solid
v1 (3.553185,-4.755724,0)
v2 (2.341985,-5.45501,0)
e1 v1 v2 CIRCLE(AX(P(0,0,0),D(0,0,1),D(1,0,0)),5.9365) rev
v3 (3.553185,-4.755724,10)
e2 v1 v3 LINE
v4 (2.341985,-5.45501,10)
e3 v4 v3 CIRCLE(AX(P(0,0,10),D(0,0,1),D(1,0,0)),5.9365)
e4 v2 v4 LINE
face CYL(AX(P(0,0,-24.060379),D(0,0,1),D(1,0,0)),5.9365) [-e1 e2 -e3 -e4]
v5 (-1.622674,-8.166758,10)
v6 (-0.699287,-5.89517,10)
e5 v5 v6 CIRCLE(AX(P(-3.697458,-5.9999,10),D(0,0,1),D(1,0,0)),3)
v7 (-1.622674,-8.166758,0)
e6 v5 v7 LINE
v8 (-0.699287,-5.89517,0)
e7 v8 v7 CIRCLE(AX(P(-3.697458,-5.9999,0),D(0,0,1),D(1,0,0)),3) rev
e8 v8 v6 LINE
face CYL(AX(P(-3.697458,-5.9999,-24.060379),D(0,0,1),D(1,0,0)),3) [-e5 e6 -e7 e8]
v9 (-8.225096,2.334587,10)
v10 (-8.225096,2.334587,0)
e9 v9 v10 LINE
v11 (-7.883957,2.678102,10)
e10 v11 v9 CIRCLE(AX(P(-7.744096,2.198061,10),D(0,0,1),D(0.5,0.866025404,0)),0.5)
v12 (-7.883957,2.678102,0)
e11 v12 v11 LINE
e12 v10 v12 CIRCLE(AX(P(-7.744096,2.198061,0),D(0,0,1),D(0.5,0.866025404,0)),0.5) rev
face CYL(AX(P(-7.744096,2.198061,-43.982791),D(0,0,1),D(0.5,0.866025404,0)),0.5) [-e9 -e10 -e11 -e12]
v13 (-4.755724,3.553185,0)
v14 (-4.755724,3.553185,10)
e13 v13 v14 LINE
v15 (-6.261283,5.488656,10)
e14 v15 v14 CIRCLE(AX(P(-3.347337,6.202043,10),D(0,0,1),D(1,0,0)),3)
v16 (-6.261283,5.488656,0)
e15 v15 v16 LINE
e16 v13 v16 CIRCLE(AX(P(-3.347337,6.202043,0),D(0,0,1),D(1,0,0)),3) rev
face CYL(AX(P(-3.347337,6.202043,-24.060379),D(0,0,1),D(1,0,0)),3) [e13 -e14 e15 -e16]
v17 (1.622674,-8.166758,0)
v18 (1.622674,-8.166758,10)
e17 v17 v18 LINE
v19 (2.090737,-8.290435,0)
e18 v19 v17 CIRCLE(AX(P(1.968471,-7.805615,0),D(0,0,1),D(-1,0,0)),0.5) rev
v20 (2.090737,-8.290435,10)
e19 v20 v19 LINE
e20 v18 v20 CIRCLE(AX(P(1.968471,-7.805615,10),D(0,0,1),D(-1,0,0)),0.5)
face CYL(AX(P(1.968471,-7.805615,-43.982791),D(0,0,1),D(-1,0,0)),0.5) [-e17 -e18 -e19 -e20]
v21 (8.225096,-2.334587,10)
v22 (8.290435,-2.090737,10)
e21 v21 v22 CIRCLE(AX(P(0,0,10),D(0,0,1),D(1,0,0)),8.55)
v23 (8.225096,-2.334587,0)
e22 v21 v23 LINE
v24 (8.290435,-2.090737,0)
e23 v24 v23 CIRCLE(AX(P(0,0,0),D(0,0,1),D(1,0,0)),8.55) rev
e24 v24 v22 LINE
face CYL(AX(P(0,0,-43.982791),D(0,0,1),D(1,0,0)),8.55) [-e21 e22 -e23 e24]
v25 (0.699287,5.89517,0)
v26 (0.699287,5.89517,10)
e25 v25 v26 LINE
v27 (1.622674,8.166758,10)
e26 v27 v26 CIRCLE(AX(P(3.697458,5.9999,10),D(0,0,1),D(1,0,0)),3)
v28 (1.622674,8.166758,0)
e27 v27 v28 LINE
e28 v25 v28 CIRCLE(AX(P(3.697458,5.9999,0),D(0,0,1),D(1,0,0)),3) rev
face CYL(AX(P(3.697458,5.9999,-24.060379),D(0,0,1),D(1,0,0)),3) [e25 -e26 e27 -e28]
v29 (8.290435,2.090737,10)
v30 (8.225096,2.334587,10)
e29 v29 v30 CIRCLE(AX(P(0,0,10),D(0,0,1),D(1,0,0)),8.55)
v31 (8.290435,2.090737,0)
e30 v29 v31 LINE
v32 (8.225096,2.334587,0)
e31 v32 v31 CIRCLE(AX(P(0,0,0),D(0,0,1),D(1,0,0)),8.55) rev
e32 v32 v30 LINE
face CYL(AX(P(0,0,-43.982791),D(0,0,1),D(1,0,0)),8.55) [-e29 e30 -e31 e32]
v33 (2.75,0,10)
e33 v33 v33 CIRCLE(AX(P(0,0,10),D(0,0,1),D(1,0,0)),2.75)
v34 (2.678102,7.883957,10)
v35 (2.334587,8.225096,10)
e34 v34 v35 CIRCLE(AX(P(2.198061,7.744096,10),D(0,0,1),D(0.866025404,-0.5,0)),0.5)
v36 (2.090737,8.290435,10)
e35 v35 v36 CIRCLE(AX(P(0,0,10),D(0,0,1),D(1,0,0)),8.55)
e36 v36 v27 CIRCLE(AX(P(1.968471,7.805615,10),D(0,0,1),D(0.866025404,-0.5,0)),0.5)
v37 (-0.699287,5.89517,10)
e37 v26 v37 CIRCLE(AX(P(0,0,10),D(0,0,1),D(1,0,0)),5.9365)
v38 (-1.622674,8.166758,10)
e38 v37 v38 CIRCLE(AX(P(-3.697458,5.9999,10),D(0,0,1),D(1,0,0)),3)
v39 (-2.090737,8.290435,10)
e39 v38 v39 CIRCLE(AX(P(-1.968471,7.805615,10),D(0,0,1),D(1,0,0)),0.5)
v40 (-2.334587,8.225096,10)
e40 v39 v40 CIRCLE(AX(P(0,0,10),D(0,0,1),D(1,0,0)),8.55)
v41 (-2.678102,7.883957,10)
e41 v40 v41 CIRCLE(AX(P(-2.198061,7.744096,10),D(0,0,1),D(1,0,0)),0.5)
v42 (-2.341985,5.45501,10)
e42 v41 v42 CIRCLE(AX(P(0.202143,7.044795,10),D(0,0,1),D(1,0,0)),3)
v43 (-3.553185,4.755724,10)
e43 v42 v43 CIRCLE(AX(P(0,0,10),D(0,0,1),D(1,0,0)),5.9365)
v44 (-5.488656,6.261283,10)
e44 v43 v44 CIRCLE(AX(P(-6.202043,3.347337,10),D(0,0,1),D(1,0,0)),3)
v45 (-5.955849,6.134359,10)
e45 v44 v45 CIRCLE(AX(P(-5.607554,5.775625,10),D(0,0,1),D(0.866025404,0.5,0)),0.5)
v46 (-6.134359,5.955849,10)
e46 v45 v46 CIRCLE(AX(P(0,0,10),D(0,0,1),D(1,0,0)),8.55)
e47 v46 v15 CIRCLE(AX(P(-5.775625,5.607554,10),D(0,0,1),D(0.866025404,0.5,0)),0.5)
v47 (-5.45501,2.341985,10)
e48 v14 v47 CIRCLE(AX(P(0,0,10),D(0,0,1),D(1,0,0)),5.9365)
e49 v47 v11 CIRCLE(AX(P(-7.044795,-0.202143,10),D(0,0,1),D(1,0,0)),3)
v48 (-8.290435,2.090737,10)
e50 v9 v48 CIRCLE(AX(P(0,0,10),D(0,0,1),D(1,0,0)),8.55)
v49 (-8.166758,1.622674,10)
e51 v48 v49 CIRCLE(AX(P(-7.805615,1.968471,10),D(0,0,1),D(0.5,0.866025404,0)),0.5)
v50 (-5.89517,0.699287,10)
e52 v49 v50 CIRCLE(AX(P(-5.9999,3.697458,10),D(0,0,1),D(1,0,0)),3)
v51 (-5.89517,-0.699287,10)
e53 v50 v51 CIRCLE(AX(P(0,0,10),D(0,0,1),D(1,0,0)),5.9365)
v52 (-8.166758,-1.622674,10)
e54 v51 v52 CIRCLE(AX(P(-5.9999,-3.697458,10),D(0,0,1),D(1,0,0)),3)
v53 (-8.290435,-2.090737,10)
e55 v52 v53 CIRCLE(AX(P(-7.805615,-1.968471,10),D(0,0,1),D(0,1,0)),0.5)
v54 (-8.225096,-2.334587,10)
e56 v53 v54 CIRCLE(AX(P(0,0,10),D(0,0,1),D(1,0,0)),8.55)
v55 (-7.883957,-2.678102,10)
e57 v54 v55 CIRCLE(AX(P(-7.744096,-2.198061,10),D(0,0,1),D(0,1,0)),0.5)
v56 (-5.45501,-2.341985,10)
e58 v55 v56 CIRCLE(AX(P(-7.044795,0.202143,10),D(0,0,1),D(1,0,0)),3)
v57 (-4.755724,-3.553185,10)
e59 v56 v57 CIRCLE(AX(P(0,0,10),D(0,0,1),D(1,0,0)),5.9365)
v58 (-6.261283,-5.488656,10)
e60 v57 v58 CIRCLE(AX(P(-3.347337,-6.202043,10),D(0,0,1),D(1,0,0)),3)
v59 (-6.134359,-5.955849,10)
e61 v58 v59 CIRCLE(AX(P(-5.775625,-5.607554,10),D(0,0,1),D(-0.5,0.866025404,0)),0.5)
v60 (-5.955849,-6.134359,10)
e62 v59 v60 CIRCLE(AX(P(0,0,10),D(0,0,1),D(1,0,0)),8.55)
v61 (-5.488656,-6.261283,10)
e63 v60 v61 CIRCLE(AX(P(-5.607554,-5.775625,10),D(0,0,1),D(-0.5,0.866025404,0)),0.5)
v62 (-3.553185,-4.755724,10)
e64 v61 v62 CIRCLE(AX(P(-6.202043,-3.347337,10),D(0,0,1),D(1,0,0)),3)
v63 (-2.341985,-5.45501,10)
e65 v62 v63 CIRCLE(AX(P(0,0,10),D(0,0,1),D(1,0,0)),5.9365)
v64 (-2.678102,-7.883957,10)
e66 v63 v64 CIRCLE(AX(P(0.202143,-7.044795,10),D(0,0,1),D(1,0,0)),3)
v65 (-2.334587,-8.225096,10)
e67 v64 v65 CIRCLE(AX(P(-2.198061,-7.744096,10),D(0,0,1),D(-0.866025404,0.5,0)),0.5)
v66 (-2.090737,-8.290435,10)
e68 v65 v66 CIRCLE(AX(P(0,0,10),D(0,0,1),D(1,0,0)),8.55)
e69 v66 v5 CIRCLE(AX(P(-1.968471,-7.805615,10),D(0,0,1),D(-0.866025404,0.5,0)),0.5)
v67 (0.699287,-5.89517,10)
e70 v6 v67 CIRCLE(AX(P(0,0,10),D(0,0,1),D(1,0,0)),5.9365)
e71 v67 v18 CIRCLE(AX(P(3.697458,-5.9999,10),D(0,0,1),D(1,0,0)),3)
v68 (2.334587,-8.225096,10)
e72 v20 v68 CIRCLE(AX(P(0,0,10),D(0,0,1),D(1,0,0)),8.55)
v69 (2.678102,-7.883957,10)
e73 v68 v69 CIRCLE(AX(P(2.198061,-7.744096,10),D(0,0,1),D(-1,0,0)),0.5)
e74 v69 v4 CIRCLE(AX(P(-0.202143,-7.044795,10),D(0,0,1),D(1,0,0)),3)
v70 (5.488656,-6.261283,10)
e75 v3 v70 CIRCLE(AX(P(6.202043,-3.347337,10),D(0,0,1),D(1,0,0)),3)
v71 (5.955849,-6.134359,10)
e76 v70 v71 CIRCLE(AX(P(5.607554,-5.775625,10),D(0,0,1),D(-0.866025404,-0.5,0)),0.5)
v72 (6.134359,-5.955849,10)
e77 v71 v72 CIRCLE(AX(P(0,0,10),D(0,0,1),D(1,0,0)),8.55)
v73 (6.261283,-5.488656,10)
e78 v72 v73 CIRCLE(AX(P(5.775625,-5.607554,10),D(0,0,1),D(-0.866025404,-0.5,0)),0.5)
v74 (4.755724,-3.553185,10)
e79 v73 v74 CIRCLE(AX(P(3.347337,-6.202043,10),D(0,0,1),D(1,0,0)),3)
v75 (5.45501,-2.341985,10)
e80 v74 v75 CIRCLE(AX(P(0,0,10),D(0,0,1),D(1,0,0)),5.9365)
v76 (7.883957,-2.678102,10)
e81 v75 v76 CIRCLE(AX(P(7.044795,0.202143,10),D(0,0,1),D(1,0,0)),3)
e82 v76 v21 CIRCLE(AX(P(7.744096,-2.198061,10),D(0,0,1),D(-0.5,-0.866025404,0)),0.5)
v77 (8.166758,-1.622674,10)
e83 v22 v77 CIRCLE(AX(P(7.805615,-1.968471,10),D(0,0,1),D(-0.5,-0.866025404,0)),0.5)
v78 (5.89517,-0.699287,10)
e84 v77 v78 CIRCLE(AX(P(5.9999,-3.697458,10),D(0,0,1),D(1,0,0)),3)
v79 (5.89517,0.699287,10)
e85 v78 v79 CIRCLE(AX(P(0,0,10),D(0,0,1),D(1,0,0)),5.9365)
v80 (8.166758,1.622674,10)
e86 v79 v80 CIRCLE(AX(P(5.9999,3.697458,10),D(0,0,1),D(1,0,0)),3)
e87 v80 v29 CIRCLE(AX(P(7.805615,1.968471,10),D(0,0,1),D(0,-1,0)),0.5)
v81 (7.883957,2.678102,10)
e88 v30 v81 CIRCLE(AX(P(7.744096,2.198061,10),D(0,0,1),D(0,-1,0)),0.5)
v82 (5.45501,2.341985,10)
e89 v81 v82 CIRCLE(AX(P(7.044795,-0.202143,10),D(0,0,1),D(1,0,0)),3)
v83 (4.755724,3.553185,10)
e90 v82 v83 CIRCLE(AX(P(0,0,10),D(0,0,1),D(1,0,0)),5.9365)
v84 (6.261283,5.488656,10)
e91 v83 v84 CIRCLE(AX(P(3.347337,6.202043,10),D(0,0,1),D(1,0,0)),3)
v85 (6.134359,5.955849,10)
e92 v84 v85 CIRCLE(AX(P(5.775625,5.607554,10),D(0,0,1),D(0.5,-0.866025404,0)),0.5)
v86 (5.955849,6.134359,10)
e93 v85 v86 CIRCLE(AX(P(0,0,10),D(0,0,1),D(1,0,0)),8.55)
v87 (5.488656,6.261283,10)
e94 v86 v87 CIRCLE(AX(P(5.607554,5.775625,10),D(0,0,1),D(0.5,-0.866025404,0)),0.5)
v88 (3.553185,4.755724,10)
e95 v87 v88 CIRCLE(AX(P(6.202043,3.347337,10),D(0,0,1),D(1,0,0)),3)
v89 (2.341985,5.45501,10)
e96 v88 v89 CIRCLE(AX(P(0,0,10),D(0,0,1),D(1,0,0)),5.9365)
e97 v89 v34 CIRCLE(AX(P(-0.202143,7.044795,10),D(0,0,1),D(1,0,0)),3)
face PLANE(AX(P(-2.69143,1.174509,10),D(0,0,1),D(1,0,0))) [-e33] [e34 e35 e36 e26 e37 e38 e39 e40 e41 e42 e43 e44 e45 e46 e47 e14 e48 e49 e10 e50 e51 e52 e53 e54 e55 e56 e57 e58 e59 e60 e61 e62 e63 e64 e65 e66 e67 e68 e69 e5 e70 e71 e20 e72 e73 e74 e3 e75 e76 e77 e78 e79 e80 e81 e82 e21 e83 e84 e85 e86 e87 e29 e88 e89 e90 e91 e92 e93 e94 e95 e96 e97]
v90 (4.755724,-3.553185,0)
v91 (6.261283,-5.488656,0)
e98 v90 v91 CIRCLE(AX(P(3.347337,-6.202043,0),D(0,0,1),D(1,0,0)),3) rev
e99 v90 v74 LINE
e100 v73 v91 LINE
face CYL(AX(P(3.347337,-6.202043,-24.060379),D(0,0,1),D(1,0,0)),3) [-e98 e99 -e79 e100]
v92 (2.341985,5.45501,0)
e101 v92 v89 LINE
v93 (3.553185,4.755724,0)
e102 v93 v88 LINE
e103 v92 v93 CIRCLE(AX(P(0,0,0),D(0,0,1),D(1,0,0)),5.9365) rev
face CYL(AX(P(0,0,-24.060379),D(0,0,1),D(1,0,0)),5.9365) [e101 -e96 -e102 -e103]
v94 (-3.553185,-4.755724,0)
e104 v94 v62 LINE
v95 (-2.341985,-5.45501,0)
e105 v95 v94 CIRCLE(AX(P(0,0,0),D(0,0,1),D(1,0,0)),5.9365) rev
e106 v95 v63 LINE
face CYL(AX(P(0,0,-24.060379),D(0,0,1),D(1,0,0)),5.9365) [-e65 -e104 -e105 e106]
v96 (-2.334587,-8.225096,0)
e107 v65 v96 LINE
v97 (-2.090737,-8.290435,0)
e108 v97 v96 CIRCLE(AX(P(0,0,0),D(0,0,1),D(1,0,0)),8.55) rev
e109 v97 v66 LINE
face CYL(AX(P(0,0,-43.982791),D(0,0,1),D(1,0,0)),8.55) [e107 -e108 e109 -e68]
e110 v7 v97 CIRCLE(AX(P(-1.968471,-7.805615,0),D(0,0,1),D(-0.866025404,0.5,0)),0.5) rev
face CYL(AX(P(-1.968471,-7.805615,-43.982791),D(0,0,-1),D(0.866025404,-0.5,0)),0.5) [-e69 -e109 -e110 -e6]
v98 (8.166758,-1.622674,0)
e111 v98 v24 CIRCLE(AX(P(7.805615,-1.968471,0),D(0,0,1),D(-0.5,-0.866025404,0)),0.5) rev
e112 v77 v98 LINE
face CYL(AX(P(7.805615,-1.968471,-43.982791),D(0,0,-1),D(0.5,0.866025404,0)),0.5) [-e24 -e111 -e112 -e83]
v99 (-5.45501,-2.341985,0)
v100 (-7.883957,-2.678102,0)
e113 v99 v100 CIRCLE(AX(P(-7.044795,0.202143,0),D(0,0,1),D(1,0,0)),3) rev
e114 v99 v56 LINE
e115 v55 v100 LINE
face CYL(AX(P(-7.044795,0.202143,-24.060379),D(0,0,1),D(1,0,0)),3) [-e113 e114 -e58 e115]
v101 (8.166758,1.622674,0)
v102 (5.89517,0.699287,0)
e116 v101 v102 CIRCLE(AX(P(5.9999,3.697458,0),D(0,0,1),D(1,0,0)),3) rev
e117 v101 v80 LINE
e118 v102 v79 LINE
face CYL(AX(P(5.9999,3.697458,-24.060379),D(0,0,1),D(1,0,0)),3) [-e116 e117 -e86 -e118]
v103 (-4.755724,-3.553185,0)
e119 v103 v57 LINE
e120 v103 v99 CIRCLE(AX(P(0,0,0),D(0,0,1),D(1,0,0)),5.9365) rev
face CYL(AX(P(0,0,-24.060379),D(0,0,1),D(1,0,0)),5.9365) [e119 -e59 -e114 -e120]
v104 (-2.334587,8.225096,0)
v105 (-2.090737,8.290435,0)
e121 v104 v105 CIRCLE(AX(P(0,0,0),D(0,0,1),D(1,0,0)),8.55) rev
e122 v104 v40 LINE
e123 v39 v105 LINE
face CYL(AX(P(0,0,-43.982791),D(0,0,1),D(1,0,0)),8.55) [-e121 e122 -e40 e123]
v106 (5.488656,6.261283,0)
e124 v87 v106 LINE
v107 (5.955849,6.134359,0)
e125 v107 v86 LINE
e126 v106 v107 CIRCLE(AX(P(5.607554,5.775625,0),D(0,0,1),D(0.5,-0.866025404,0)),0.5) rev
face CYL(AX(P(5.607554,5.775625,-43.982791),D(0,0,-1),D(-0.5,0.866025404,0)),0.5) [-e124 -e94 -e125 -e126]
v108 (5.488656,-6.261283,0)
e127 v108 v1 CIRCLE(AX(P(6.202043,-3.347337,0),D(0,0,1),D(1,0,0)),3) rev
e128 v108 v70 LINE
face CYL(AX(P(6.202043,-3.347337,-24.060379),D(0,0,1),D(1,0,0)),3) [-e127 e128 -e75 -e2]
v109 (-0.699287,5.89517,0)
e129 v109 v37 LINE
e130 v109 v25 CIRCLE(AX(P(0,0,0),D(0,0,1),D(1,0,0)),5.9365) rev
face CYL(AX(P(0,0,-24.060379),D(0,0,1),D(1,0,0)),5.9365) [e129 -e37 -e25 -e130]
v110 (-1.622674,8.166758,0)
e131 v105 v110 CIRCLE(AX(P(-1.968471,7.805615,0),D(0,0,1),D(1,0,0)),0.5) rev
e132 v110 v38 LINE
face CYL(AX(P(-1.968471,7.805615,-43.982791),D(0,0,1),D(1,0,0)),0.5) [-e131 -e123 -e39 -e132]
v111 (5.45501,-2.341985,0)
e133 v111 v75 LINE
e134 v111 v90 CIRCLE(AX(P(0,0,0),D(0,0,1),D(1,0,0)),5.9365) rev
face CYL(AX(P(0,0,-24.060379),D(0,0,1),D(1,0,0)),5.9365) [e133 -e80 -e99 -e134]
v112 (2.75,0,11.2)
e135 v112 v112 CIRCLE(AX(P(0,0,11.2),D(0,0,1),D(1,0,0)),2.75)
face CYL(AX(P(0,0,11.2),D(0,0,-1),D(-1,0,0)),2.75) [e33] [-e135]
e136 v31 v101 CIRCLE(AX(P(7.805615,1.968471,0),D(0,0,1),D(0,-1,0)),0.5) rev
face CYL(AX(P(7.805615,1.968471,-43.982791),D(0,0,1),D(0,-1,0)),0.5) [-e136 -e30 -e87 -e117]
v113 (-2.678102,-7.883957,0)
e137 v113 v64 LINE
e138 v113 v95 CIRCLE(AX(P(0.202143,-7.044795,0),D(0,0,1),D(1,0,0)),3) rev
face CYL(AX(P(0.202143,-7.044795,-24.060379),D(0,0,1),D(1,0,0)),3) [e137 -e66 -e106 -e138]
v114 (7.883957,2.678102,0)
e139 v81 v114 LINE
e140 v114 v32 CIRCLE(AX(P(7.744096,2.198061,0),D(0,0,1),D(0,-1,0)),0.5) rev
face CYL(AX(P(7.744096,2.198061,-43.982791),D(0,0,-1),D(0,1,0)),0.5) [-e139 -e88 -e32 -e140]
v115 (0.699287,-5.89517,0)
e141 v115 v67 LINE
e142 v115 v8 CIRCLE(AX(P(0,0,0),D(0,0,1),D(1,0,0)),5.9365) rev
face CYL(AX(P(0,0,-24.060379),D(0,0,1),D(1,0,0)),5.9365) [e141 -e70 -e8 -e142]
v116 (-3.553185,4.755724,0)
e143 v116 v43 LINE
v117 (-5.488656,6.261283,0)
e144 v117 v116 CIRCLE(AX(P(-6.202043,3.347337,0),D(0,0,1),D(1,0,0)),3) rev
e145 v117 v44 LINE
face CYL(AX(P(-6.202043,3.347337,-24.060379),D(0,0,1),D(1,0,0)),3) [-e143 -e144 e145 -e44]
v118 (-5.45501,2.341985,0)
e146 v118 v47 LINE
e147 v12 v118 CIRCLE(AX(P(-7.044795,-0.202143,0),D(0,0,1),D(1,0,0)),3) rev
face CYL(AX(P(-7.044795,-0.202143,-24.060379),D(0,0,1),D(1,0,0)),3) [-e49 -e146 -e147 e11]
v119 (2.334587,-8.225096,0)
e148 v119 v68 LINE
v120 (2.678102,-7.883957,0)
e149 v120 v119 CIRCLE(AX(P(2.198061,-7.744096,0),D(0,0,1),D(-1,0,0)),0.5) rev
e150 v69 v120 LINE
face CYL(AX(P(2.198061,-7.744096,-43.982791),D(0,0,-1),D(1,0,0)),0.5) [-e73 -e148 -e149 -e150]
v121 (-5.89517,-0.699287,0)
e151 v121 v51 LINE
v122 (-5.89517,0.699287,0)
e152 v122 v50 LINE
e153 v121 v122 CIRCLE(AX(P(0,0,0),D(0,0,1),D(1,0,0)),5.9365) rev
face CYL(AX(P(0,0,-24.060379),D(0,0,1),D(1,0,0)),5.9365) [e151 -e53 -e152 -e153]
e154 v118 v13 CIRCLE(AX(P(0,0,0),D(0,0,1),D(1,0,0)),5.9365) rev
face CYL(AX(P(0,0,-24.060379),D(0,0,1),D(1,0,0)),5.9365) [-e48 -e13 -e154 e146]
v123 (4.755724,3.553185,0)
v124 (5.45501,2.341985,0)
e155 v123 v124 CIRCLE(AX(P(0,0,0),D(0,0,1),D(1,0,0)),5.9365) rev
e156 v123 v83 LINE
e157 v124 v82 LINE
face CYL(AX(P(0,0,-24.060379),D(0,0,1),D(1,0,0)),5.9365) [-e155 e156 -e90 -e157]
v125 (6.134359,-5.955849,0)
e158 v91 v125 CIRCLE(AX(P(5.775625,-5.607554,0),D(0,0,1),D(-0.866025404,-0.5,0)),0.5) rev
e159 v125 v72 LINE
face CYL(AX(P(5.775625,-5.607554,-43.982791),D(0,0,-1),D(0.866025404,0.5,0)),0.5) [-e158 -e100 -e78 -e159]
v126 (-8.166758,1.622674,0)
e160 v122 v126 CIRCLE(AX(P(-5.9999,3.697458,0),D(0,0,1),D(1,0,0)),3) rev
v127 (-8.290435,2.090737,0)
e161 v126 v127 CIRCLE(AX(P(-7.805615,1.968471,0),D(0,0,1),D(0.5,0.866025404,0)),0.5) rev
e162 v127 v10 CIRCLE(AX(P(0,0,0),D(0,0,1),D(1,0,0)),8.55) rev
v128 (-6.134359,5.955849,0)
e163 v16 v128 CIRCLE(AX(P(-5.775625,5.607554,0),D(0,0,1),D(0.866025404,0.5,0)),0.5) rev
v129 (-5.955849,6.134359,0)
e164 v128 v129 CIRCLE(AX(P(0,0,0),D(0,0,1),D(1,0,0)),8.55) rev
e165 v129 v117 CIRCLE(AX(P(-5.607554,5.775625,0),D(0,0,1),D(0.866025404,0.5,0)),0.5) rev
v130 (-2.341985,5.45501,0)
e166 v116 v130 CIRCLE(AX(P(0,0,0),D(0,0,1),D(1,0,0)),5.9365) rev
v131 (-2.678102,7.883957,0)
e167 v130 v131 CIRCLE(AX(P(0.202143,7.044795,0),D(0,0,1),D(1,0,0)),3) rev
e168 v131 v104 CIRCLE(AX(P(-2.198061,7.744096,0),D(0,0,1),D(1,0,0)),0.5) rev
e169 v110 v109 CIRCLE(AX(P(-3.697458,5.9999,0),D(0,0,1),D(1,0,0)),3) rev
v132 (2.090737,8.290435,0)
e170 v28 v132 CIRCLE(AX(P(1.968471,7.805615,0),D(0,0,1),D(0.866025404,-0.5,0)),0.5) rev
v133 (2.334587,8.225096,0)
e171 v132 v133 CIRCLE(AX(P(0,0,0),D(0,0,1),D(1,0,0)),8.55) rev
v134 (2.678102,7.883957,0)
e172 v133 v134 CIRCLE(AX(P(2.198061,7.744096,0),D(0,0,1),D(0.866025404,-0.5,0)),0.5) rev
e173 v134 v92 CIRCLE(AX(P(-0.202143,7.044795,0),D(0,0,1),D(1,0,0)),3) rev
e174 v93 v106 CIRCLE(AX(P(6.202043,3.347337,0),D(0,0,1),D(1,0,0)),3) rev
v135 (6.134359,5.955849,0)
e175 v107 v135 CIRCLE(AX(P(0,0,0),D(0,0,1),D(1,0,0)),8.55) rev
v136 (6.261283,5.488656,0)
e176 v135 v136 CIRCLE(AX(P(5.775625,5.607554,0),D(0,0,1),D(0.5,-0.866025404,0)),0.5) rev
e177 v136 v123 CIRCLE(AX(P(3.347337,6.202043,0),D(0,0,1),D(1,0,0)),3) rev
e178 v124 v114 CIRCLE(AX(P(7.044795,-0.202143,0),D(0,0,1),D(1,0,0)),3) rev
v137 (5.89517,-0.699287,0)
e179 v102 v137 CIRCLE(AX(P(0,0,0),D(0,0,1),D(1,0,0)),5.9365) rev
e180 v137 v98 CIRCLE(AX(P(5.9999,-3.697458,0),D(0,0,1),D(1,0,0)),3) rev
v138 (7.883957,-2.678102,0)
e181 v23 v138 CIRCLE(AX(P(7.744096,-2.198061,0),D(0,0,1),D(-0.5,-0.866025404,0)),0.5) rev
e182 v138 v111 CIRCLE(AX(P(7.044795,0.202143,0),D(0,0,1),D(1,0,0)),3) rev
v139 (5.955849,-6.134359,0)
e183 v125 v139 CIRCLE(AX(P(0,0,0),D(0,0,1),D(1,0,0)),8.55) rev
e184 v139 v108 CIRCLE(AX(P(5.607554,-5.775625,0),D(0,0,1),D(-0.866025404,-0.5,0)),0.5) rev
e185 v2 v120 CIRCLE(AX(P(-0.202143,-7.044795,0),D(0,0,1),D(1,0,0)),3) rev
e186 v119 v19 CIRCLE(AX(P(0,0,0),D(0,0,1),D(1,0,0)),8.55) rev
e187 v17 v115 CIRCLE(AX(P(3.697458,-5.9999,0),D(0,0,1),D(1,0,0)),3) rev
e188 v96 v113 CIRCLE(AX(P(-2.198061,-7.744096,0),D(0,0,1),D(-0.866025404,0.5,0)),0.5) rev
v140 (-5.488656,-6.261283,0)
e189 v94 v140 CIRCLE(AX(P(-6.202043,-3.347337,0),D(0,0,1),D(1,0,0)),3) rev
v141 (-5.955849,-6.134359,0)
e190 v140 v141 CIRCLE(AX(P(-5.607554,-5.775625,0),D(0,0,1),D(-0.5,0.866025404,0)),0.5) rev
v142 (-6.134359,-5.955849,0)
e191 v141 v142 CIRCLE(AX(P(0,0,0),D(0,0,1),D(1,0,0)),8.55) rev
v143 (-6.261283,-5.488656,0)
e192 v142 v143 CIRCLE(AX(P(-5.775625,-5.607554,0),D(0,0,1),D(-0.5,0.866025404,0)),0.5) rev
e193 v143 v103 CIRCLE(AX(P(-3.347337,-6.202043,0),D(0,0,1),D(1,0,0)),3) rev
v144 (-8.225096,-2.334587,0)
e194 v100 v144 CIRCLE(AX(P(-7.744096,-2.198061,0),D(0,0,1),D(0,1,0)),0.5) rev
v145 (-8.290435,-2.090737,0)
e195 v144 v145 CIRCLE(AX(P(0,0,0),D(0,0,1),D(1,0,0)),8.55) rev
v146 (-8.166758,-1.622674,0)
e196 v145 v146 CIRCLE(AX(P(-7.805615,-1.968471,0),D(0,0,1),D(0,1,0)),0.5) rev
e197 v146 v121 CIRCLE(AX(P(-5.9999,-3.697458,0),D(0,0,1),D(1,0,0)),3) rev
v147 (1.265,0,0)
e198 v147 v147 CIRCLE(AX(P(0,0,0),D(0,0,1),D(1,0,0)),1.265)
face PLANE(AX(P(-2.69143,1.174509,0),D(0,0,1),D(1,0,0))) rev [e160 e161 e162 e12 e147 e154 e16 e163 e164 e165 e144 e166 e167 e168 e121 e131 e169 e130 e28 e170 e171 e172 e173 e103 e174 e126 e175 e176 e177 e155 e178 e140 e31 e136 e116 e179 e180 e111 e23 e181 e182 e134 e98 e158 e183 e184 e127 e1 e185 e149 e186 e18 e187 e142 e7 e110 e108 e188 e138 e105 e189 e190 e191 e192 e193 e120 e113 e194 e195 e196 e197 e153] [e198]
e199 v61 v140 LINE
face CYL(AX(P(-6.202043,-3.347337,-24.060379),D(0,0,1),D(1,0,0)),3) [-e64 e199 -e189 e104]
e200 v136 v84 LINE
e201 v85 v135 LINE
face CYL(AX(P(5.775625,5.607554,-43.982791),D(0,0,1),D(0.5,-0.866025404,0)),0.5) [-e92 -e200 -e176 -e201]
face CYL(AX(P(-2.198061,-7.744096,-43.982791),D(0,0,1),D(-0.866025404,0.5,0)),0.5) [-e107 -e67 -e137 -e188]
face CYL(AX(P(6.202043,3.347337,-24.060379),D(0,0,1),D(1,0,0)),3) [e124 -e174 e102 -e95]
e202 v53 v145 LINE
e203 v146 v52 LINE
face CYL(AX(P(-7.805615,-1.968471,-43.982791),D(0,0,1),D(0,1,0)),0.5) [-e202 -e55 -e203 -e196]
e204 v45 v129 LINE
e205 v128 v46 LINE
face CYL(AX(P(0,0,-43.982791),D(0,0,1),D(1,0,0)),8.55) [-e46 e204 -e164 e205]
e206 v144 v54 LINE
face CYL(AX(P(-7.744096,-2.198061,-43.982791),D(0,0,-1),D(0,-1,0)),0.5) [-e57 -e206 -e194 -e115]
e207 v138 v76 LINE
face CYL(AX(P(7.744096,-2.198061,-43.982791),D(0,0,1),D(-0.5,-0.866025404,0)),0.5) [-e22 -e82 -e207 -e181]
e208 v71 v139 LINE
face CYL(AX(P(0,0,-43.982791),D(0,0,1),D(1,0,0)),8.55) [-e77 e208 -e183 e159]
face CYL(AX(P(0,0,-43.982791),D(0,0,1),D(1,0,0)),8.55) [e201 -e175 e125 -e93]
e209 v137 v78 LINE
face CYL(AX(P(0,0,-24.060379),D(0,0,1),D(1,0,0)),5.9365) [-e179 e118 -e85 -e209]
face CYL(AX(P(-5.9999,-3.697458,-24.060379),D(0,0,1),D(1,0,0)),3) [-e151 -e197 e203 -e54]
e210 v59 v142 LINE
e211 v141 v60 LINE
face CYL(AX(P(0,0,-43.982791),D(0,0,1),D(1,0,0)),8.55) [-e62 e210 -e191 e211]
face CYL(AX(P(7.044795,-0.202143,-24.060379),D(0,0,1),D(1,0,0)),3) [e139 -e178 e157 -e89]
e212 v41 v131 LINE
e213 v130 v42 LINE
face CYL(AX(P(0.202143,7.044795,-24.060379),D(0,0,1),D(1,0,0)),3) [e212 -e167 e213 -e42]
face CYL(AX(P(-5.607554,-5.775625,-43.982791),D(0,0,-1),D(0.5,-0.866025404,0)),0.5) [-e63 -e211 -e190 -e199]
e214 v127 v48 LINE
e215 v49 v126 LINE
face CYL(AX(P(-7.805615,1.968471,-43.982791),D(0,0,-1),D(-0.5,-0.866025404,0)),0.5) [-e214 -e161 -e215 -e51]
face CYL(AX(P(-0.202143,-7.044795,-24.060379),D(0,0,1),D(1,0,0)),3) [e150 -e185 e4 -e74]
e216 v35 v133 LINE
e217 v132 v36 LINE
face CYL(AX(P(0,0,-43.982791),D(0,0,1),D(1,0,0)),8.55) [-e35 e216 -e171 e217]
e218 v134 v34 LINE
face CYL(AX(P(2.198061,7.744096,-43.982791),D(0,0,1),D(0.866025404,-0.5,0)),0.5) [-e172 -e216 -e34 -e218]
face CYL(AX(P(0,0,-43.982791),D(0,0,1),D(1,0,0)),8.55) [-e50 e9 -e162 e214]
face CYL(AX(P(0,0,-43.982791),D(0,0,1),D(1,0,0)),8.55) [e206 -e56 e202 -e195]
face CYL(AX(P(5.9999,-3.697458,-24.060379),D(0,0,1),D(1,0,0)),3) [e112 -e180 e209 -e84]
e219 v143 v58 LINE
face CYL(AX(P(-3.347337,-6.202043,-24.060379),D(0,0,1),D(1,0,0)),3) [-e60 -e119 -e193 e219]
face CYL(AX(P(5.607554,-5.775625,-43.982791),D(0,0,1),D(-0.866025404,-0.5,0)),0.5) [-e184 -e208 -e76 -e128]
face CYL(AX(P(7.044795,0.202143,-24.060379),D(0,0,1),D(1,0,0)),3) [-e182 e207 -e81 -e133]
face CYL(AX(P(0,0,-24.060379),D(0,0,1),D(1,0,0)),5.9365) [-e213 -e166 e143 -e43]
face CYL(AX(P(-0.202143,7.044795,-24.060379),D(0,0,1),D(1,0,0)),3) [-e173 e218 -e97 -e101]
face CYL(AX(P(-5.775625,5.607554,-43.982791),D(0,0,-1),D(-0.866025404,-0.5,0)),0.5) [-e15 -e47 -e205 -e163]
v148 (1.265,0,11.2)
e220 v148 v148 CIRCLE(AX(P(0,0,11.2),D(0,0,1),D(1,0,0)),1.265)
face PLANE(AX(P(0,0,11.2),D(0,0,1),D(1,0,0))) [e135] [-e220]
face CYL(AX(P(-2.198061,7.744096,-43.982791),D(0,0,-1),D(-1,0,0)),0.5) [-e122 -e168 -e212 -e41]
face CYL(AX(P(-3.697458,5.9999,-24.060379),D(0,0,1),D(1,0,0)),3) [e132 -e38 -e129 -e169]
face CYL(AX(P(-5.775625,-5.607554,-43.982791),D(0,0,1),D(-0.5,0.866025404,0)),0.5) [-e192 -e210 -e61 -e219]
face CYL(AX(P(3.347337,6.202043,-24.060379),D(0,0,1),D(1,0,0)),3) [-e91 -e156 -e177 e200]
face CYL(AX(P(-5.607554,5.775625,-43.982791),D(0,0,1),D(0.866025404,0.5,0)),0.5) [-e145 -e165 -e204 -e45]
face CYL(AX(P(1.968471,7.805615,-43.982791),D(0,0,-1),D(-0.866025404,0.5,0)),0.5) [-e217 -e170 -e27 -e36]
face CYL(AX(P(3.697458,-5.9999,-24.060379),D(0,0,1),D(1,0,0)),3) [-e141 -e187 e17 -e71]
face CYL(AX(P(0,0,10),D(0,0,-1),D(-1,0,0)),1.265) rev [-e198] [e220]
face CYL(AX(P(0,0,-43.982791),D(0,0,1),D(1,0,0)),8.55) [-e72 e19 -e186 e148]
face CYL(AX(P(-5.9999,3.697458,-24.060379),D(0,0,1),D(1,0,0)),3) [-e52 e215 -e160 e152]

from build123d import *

# Parameters (mm, degrees)
SKETCH_1_R               = 1.265
EXTRUDE_1_DEPTH          = 10
SKETCH_2_R               = 2.75
SKETCH_2_R_2             = 1.265
EXTRUDE_2_DEPTH          = 1.2
SKETCH_3_R               = 10.210079725
SKETCH_3_R_2             = 7.3
CUT_EXTRUDE_2_DEPTH      = 16.316956182
FILLET_1_R               = 0.5
PATTERN_CIRCULAR_2_DEPTH = 10
CUT_EXTRUDE_START        = -10
SKETCH_5_R               = 9.117609572
SKETCH_5_R_2             = 4.6865
CUT_EXTRUDE_3_DEPTH      = 10
EXTRUDE_START            = -10
SKETCH_4_R               = 1.265
EXTRUDE_3_DEPTH          = 10
SKETCH_6_R               = 15.550265039
SKETCH_6_R_2             = 8.55
CUT_EXTRUDE_4_DEPTH      = 10
FILLET_2_R               = 0.5
PATTERN_CIRCULAR_4_DEPTH = 10


# Read off the part's stored shape, not the designer's step: Круговой массив2, Круговой массив4
with BuildPart() as part:
    # Эскиз1 → Бобышка-Вытянуть1 (new body)
    with BuildSketch(Plane.XY):
        with BuildLine():
            ThreePointArc((-3.148803906, 3.471068454), (-4.227852242, 4.566214035), (-5.743712894, 4.822837566))
            ThreePointArc((-5.743712894, 4.822837566), (-5.841480421, 4.703945843), (-5.936787387, 4.583072716))
            ThreePointArc((-5.936787387, 4.583072716), (-5.362797198, 3.156810321), (-4.062728379, 2.336133637))
            ThreePointArc((-4.062728379, 2.336133637), (-4.379801209, 1.667520202), (-4.587678719, 0.95733287))
            ThreePointArc((-4.587678719, 0.95733287), (-6.104357582, 1.209075557), (-7.481554138, 0.525687819))
            ThreePointArc((-7.481554138, 0.525687819), (-7.490766927, 0.372036085), (-7.496824441, 0.218227641))
            ThreePointArc((-7.496824441, 0.218227641), (-6.194120622, -0.598259906), (-4.659961201, -0.498040012))
            ThreePointArc((-4.659961201, -0.498040012), (-4.523477392, -1.225330377), (-4.274216191, -1.922071332))
            ThreePointArc((-4.274216191, -1.922071332), (-5.649205805, -2.609888688), (-6.361695989, -3.972256807))
            ThreePointArc((-6.361695989, -3.972256807), (-6.278835069, -4.101978813), (-6.193329365, -4.229972975))
            ThreePointArc((-6.193329365, -4.229972975), (-4.659500498, -4.124815183), (-3.477247231, -3.141979304))
            ThreePointArc((-3.477247231, -3.141979304), (-2.939338959, -3.650146399), (-2.328148353, -4.067309614))
            ThreePointArc((-2.328148353, -4.067309614), (-3.03624942, -5.431964161), (-2.811886199, -6.952934345))
            ThreePointArc((-2.811886199, -6.952934345), (-2.668601624, -7.009177225), (-2.524192976, -7.062467686))
            ThreePointArc((-2.524192976, -7.062467686), (-1.345109555, -6.075831258), (-0.966343005, -4.585789294))
            ThreePointArc((-0.966343005, -4.585789294), (-0.232472948, -4.68073056), (0.507193024, -4.658973866))
            ThreePointArc((0.507193024, -4.658973866), (0.736451045, -6.179213951), (1.811968547, -7.277827285))
            ThreePointArc((1.811968547, -7.277827285), (1.960946938, -7.239108171), (2.109099336, -7.197339786))
            ThreePointArc((2.109099336, -7.197339786), (2.483067519, -5.706086302), (1.913671403, -4.277983638))
            ThreePointArc((1.913671403, -4.277983638), (2.563189827, -3.92343474), (3.148803906, -3.471068454))
            ThreePointArc((3.148803906, -3.471068454), (4.227852242, -4.566214035), (5.743712894, -4.822837566))
            ThreePointArc((5.743712894, -4.822837566), (5.841480421, -4.703945843), (5.936787387, -4.583072716))
            ThreePointArc((5.936787387, -4.583072716), (5.362797198, -3.156810321), (4.062728379, -2.336133637))
            ThreePointArc((4.062728379, -2.336133637), (4.379801209, -1.667520202), (4.587678719, -0.95733287))
            ThreePointArc((4.587678719, -0.95733287), (6.104357582, -1.209075557), (7.481554138, -0.525687819))
            ThreePointArc((7.481554138, -0.525687819), (7.490766927, -0.372036085), (7.496824441, -0.218227641))
            ThreePointArc((7.496824441, -0.218227641), (6.194120622, 0.598259906), (4.659961201, 0.498040012))
            ThreePointArc((4.659961201, 0.498040012), (4.523477392, 1.225330377), (4.274216191, 1.922071332))
            ThreePointArc((4.274216191, 1.922071332), (5.649205805, 2.609888688), (6.361695989, 3.972256807))
            ThreePointArc((6.361695989, 3.972256807), (6.278835069, 4.101978813), (6.193329365, 4.229972975))
            ThreePointArc((6.193329365, 4.229972975), (4.659500498, 4.124815183), (3.477247231, 3.141979304))
            ThreePointArc((3.477247231, 3.141979304), (2.939338959, 3.650146399), (2.328148353, 4.067309614))
            ThreePointArc((2.328148353, 4.067309614), (3.03624942, 5.431964161), (2.811886199, 6.952934345))
            ThreePointArc((2.811886199, 6.952934345), (2.668601624, 7.009177225), (2.524192976, 7.062467686))
            ThreePointArc((2.524192976, 7.062467686), (1.345109555, 6.075831258), (0.966343005, 4.585789294))
            ThreePointArc((0.966343005, 4.585789294), (0.232472948, 4.68073056), (-0.507193024, 4.658973866))
            ThreePointArc((-0.507193024, 4.658973866), (-0.736451045, 6.179213951), (-1.811968547, 7.277827285))
            ThreePointArc((-1.811968547, 7.277827285), (-1.960946938, 7.239108171), (-2.109099336, 7.197339786))
            ThreePointArc((-2.109099336, 7.197339786), (-2.483067519, 5.706086302), (-1.913671403, 4.277983638))
            ThreePointArc((-1.913671403, 4.277983638), (-2.563189827, 3.92343474), (-3.148803906, 3.471068454))
        make_face()
        Circle(SKETCH_1_R, mode=Mode.SUBTRACT)
    extrude(amount=EXTRUDE_1_DEPTH)

    # Эскиз2 → Бобышка-Вытянуть2 (add)
    with BuildSketch(Plane.XY.offset(10)):
        Circle(SKETCH_2_R)
        Circle(SKETCH_2_R_2, mode=Mode.SUBTRACT)
    extrude(amount=EXTRUDE_2_DEPTH)

    # Эскиз3 → Вырез-Вытянуть2 (cut, through all)
    with BuildSketch(Plane(origin=(0, 0, 0), x_dir=(-1, 0, 0), z_dir=(0, 0, -1))):
        Circle(SKETCH_3_R)
        Circle(SKETCH_3_R_2, mode=Mode.SUBTRACT)
    extrude(amount=-CUT_EXTRUDE_2_DEPTH, mode=Mode.SUBTRACT)

    # Скругление1
    fillet_1_edges = [part.edges().sort_by_distance(p)[0] for p in [
        (-2.246892365, 6.945608303, 5),
        (-1.565958675, 7.13006125, 5),
    ]]
    fillet(fillet_1_edges, radius=FILLET_1_R)

    # Круговой массив2 outline → Круговой массив2 (cut)
    with BuildSketch(Plane.XY):
        with BuildLine():
            ThreePointArc((-5.838293306, 4.042408612), (-5.850561559, 4.278183981), (-5.753278974, 4.493304024))
            ThreePointArc((-5.753278974, 4.493304024), (-5.827604273, 4.396479095), (-5.900300237, 4.298424958))
            ThreePointArc((-5.900300237, 4.298424958), (-5.872671085, 4.169599529), (-5.838293306, 4.042408612))
        make_face()
        with BuildLine():
            ThreePointArc((-5.457832031, 4.847893307), (-5.538127486, 4.755958783), (-5.61687454, 4.662694543))
            ThreePointArc((-5.61687454, 4.662694543), (-5.427449488, 4.803615386), (-5.19448163, 4.841910441))
            ThreePointArc((-5.19448163, 4.841910441), (-5.326077976, 4.84837285), (-5.457832031, 4.847893307))
        make_face()
        with BuildLine():
            ThreePointArc((-7.099346669, -0.161285439), (-7.247857179, 0.022249743), (-7.295598302, 0.253466783))
            ThreePointArc((-7.295598302, 0.253466783), (-7.298816468, 0.131446456), (-7.299993962, 0.009389377))
            ThreePointArc((-7.299993962, 0.009389377), (-7.201919821, -0.078592576), (-7.099346669, -0.161285439))
        make_face()
        with BuildLine():
            ThreePointArc((-7.264999056, 0.713994895), (-7.275921686, 0.592421818), (-7.284810046, 0.470683106))
            ThreePointArc((-7.284810046, 0.470683106), (-7.214393154, 0.696031715), (-7.048427465, 0.863948137))
            ThreePointArc((-7.048427465, 0.863948137), (-7.158689654, 0.791825944), (-7.264999056, 0.713994895))
        make_face()
        with BuildLine():
            ThreePointArc((-5.648690902, -4.303373934), (-5.876717701, -4.24218314), (-6.051247048, -4.083186154))
            ThreePointArc((-6.051247048, -4.083186154), (-5.982128849, -4.183794263), (-5.911338111, -4.283232627))
            ThreePointArc((-5.911338111, -4.283232627), (-5.78027997, -4.296764989), (-5.648690902, -4.303373934))
        make_face()
        with BuildLine():
            ThreePointArc((-6.29718337, -3.692625299), (-6.234561102, -3.797400146), (-6.170195716, -3.90111328))
            ThreePointArc((-6.170195716, -3.90111328), (-6.245683843, -3.677412414), (-6.210113576, -3.444012991))
            ThreePointArc((-6.210113576, -3.444012991), (-6.2569252, -3.567171559), (-6.29718337, -3.692625299))
        make_face()
        with BuildLine():
            ThreePointArc((-2.040427202, -6.801719852), (-2.260871804, -6.88624625), (-2.495525095, -6.860200762))
            ThreePointArc((-2.495525095, -6.860200762), (-2.380471335, -6.900967774), (-2.264752021, -6.939805349))
            ThreePointArc((-2.264752021, -6.939805349), (-2.150769635, -6.873719217), (-2.040427202, -6.801719852))
        make_face()
        with BuildLine():
            ThreePointArc((-2.92405767, -6.688788137), (-2.811810081, -6.736744322), (-2.69877634, -6.782816986))
            ThreePointArc((-2.69877634, -6.782816986), (-2.891335587, -6.646209992), (-2.999747375, -6.436478214))
            ThreePointArc((-2.999747375, -6.436478214), (-2.965227985, -6.563630771), (-2.92405767, -6.688788137))
        make_face()
        with BuildLine():
            ThreePointArc((2.347210337, -6.702039969), (2.218550278, -6.899997348), (2.013402624, -7.016851849))
            ThreePointArc((2.013402624, -7.016851849), (2.130445319, -6.982206151), (2.246892365, -6.945608303))
            ThreePointArc((2.246892365, -6.945608303), (2.300261598, -6.825146334), (2.347210337, -6.702039969))
        make_face()
        with BuildLine():
            ThreePointArc((1.565958675, -7.13006125), (1.684956821, -7.102881142), (1.80348387, -7.073715143))
            ThreePointArc((1.80348387, -7.073715143), (1.56740459, -7.076381249), (1.356420365, -6.970427527))
            ThreePointArc((1.356420365, -6.970427527), (1.459085537, -7.053006118), (1.565958675, -7.13006125))
        make_face()
        with BuildLine():
            ThreePointArc((5.838293306, -4.042408612), (5.850561559, -4.278183981), (5.753278974, -4.493304024))
            ThreePointArc((5.753278974, -4.493304024), (5.827604273, -4.396479095), (5.900300237, -4.298424958))
            ThreePointArc((5.900300237, -4.298424958), (5.872671085, -4.169599529), (5.838293306, -4.042408612))
        make_face()
        with BuildLine():
            ThreePointArc((5.457832031, -4.847893307), (5.538127486, -4.755958783), (5.61687454, -4.662694543))
            ThreePointArc((5.61687454, -4.662694543), (5.427449488, -4.803615386), (5.19448163, -4.841910441))
            ThreePointArc((5.19448163, -4.841910441), (5.326077976, -4.84837285), (5.457832031, -4.847893307))
        make_face()
        with BuildLine():
            ThreePointArc((7.099346669, 0.161285439), (7.247857179, -0.022249743), (7.295598302, -0.253466783))
            ThreePointArc((7.295598302, -0.253466783), (7.298816468, -0.131446456), (7.299993962, -0.009389377))
            ThreePointArc((7.299993962, -0.009389377), (7.201919821, 0.078592576), (7.099346669, 0.161285439))
        make_face()
        with BuildLine():
            ThreePointArc((7.264999056, -0.713994895), (7.275921686, -0.592421818), (7.284810046, -0.470683106))
            ThreePointArc((7.284810046, -0.470683106), (7.214393154, -0.696031715), (7.048427465, -0.863948137))
            ThreePointArc((7.048427465, -0.863948137), (7.158689654, -0.791825944), (7.264999056, -0.713994895))
        make_face()
        with BuildLine():
            ThreePointArc((5.648690902, 4.303373934), (5.876717701, 4.24218314), (6.051247048, 4.083186154))
            ThreePointArc((6.051247048, 4.083186154), (5.982128849, 4.183794263), (5.911338111, 4.283232627))
            ThreePointArc((5.911338111, 4.283232627), (5.78027997, 4.296764989), (5.648690902, 4.303373934))
        make_face()
        with BuildLine():
            ThreePointArc((6.29718337, 3.692625299), (6.234561102, 3.797400146), (6.170195716, 3.90111328))
            ThreePointArc((6.170195716, 3.90111328), (6.245683843, 3.677412414), (6.210113576, 3.444012991))
            ThreePointArc((6.210113576, 3.444012991), (6.2569252, 3.567171559), (6.29718337, 3.692625299))
        make_face()
        with BuildLine():
            ThreePointArc((2.040427202, 6.801719852), (2.260871804, 6.88624625), (2.495525095, 6.860200762))
            ThreePointArc((2.495525095, 6.860200762), (2.380471335, 6.900967774), (2.264752021, 6.939805349))
            ThreePointArc((2.264752021, 6.939805349), (2.150769635, 6.873719217), (2.040427202, 6.801719852))
        make_face()
        with BuildLine():
            ThreePointArc((2.92405767, 6.688788137), (2.811810081, 6.736744322), (2.69877634, 6.782816986))
            ThreePointArc((2.69877634, 6.782816986), (2.891335587, 6.646209992), (2.999747375, 6.436478214))
            ThreePointArc((2.999747375, 6.436478214), (2.965227985, 6.563630771), (2.92405767, 6.688788137))
        make_face()
    extrude(amount=PATTERN_CIRCULAR_2_DEPTH, mode=Mode.SUBTRACT)

    # Эскиз5 → Вырез-Вытянуть3 (cut)
    with BuildSketch(Plane.XY.offset(10).offset(CUT_EXTRUDE_START)):
        Circle(SKETCH_5_R)
        Circle(SKETCH_5_R_2, mode=Mode.SUBTRACT)
    extrude(amount=CUT_EXTRUDE_3_DEPTH, mode=Mode.SUBTRACT)

    # Эскиз4 → Бобышка-Вытянуть3 (add)
    with BuildSketch(Plane.XY.offset(10).offset(EXTRUDE_START)):
        with BuildLine():
            ThreePointArc((4.755723654, 3.55318516), (5.872933327, 4.582980438), (6.342289434, 6.028089642))
            ThreePointArc((6.342289434, 6.028089642), (6.187184335, 6.187184335), (6.028089642, 6.342289434))
            ThreePointArc((6.028089642, 6.342289434), (4.582980438, 5.872933327), (3.55318516, 4.755723654))
            ThreePointArc((3.55318516, 4.755723654), (2.96825, 5.14115981), (2.341984918, 5.45501044))
            ThreePointArc((2.341984918, 5.45501044), (2.794619237, 6.905444148), (2.478538947, 8.391623483))
            ThreePointArc((2.478538947, 8.391623483), (2.264666645, 8.45185098), (2.049334049, 8.506628589))
            ThreePointArc((2.049334049, 8.506628589), (1.03251082, 7.377599675), (0.699286786, 5.895170077))
            ThreePointArc((0.699286786, 5.895170077), (0, 5.9365), (-0.699286786, 5.895170077))
            ThreePointArc((-0.699286786, 5.895170077), (-1.03251082, 7.377599675), (-2.049334049, 8.506628589))
            ThreePointArc((-2.049334049, 8.506628589), (-2.264666645, 8.45185098), (-2.478538947, 8.391623483))
            ThreePointArc((-2.478538947, 8.391623483), (-2.794619237, 6.905444148), (-2.341984918, 5.45501044))
            ThreePointArc((-2.341984918, 5.45501044), (-2.96825, 5.14115981), (-3.55318516, 4.755723654))
            ThreePointArc((-3.55318516, 4.755723654), (-4.582980438, 5.872933327), (-6.028089642, 6.342289434))
            ThreePointArc((-6.028089642, 6.342289434), (-6.187184335, 6.187184335), (-6.342289434, 6.028089642))
            ThreePointArc((-6.342289434, 6.028089642), (-5.872933327, 4.582980438), (-4.755723654, 3.55318516))
            ThreePointArc((-4.755723654, 3.55318516), (-5.14115981, 2.96825), (-5.45501044, 2.341984918))
            ThreePointArc((-5.45501044, 2.341984918), (-6.905444148, 2.794619237), (-8.391623483, 2.478538947))
            ThreePointArc((-8.391623483, 2.478538947), (-8.45185098, 2.264666645), (-8.506628589, 2.049334049))
            ThreePointArc((-8.506628589, 2.049334049), (-7.377599675, 1.03251082), (-5.895170077, 0.699286786))
            ThreePointArc((-5.895170077, 0.699286786), (-5.9365, 0), (-5.895170077, -0.699286786))
            ThreePointArc((-5.895170077, -0.699286786), (-7.377599675, -1.03251082), (-8.506628589, -2.049334049))
            ThreePointArc((-8.506628589, -2.049334049), (-8.45185098, -2.264666645), (-8.391623483, -2.478538947))
            ThreePointArc((-8.391623483, -2.478538947), (-6.905444148, -2.794619237), (-5.45501044, -2.341984918))
            ThreePointArc((-5.45501044, -2.341984918), (-5.14115981, -2.96825), (-4.755723654, -3.55318516))
            ThreePointArc((-4.755723654, -3.55318516), (-5.872933327, -4.582980438), (-6.342289434, -6.028089642))
            ThreePointArc((-6.342289434, -6.028089642), (-6.187184335, -6.187184335), (-6.028089642, -6.342289434))
            ThreePointArc((-6.028089642, -6.342289434), (-4.582980438, -5.872933327), (-3.55318516, -4.755723654))
            ThreePointArc((-3.55318516, -4.755723654), (-2.96825, -5.14115981), (-2.341984918, -5.45501044))
            ThreePointArc((-2.341984918, -5.45501044), (-2.794619237, -6.905444148), (-2.478538947, -8.391623483))
            ThreePointArc((-2.478538947, -8.391623483), (-2.264666645, -8.45185098), (-2.049334049, -8.506628589))
            ThreePointArc((-2.049334049, -8.506628589), (-1.03251082, -7.377599675), (-0.699286786, -5.895170077))
            ThreePointArc((-0.699286786, -5.895170077), (0, -5.9365), (0.699286786, -5.895170077))
            ThreePointArc((0.699286786, -5.895170077), (1.03251082, -7.377599675), (2.049334049, -8.506628589))
            ThreePointArc((2.049334049, -8.506628589), (2.264666645, -8.45185098), (2.478538947, -8.391623483))
            ThreePointArc((2.478538947, -8.391623483), (2.794619237, -6.905444148), (2.341984918, -5.45501044))
            ThreePointArc((2.341984918, -5.45501044), (2.96825, -5.14115981), (3.55318516, -4.755723654))
            ThreePointArc((3.55318516, -4.755723654), (4.582980438, -5.872933327), (6.028089642, -6.342289434))
            ThreePointArc((6.028089642, -6.342289434), (6.187184335, -6.187184335), (6.342289434, -6.028089642))
            ThreePointArc((6.342289434, -6.028089642), (5.872933327, -4.582980438), (4.755723654, -3.55318516))
            ThreePointArc((4.755723654, -3.55318516), (5.14115981, -2.96825), (5.45501044, -2.341984918))
            ThreePointArc((5.45501044, -2.341984918), (6.905444148, -2.794619237), (8.391623483, -2.478538947))
            ThreePointArc((8.391623483, -2.478538947), (8.45185098, -2.264666645), (8.506628589, -2.049334049))
            ThreePointArc((8.506628589, -2.049334049), (7.377599675, -1.03251082), (5.895170077, -0.699286786))
            ThreePointArc((5.895170077, -0.699286786), (5.9365, 0), (5.895170077, 0.699286786))
            ThreePointArc((5.895170077, 0.699286786), (7.377599675, 1.03251082), (8.506628589, 2.049334049))
            ThreePointArc((8.506628589, 2.049334049), (8.45185098, 2.264666645), (8.391623483, 2.478538947))
            ThreePointArc((8.391623483, 2.478538947), (6.905444148, 2.794619237), (5.45501044, 2.341984918))
            ThreePointArc((5.45501044, 2.341984918), (5.14115981, 2.96825), (4.755723654, 3.55318516))
        make_face()
        Circle(SKETCH_4_R, mode=Mode.SUBTRACT)
    extrude(amount=EXTRUDE_3_DEPTH)

    # Эскиз6 → Вырез-Вытянуть4 (cut)
    with BuildSketch(Plane.XY.offset(10)):
        Circle(SKETCH_6_R)
        Circle(SKETCH_6_R_2, mode=Mode.SUBTRACT)
    extrude(amount=-CUT_EXTRUDE_4_DEPTH, mode=Mode.SUBTRACT)

    # Скругление2
    fillet_2_edges = [part.edges().sort_by_distance(p)[0] for p in [
        (-1.834015536, 8.350981201, 5),
        (-2.587186555, 8.149169634, 5),
    ]]
    fillet(fillet_2_edges, radius=FILLET_2_R)

    # Круговой массив4 outline → Круговой массив4 (cut)
    with BuildSketch(Plane.XY):
        with BuildLine():
            ThreePointArc((5.763794646, 6.315154098), (5.625595497, 6.291434191), (5.48865567, 6.261282532))
            ThreePointArc((5.48865567, 6.261282532), (5.738638085, 6.258135911), (5.955848779, 6.134359406))
            ThreePointArc((5.955848779, 6.134359406), (5.860518934, 6.225497395), (5.763794646, 6.315154098))
        make_face()
        with BuildLine():
            ThreePointArc((6.315154098, 5.763794646), (6.225497395, 5.860518934), (6.134359406, 5.955848779))
            ThreePointArc((6.134359406, 5.955848779), (6.258135911, 5.738638085), (6.261282532, 5.48865567))
            ThreePointArc((6.261282532, 5.48865567), (6.291434191, 5.625595497), (6.315154098, 5.763794646))
        make_face()
        with BuildLine():
            ThreePointArc((1.834015536, 8.350981201), (1.726191515, 8.261339585), (1.622673976, 8.166757568))
            ThreePointArc((1.622673976, 8.166757568), (1.840738409, 8.289023721), (2.090736641, 8.290435471))
            ThreePointArc((2.090736641, 8.290435471), (1.962609579, 8.321698363), (1.834015536, 8.350981201))
        make_face()
        with BuildLine():
            ThreePointArc((2.587186555, 8.149169634), (2.461179428, 8.188106974), (2.334586692, 8.225096047))
            ThreePointArc((2.334586692, 8.225096047), (2.550385637, 8.09887432), (2.678101898, 7.883956508))
            ThreePointArc((2.678101898, 7.883956508), (2.635744088, 8.017625707), (2.587186555, 8.149169634))
        make_face()
        with BuildLine():
            ThreePointArc((-6.315154098, 5.763794646), (-6.291434191, 5.625595497), (-6.261282532, 5.48865567))
            ThreePointArc((-6.261282532, 5.48865567), (-6.258135911, 5.738638085), (-6.134359406, 5.955848779))
            ThreePointArc((-6.134359406, 5.955848779), (-6.225497395, 5.860518934), (-6.315154098, 5.763794646))
        make_face()
        with BuildLine():
            ThreePointArc((-5.763794646, 6.315154098), (-5.860518934, 6.225497395), (-5.955848779, 6.134359406))
            ThreePointArc((-5.955848779, 6.134359406), (-5.738638085, 6.258135911), (-5.48865567, 6.261282532))
            ThreePointArc((-5.48865567, 6.261282532), (-5.625595497, 6.291434191), (-5.763794646, 6.315154098))
        make_face()
        with BuildLine():
            ThreePointArc((-8.350981201, 1.834015536), (-8.261339585, 1.726191515), (-8.166757568, 1.622673976))
            ThreePointArc((-8.166757568, 1.622673976), (-8.289023721, 1.840738409), (-8.290435471, 2.090736641))
            ThreePointArc((-8.290435471, 2.090736641), (-8.321698363, 1.962609579), (-8.350981201, 1.834015536))
        make_face()
        with BuildLine():
            ThreePointArc((-8.149169634, 2.587186555), (-8.188106974, 2.461179428), (-8.225096047, 2.334586692))
            ThreePointArc((-8.225096047, 2.334586692), (-8.09887432, 2.550385637), (-7.883956508, 2.678101898))
            ThreePointArc((-7.883956508, 2.678101898), (-8.017625707, 2.635744088), (-8.149169634, 2.587186555))
        make_face()
        with BuildLine():
            ThreePointArc((-8.149169634, -2.587186555), (-8.017625707, -2.635744088), (-7.883956508, -2.678101898))
            ThreePointArc((-7.883956508, -2.678101898), (-8.09887432, -2.550385637), (-8.225096047, -2.334586692))
            ThreePointArc((-8.225096047, -2.334586692), (-8.188106974, -2.461179428), (-8.149169634, -2.587186555))
        make_face()
        with BuildLine():
            ThreePointArc((-8.350981201, -1.834015536), (-8.321698363, -1.962609579), (-8.290435471, -2.090736641))
            ThreePointArc((-8.290435471, -2.090736641), (-8.289023721, -1.840738409), (-8.166757568, -1.622673976))
            ThreePointArc((-8.166757568, -1.622673976), (-8.261339585, -1.726191515), (-8.350981201, -1.834015536))
        make_face()
        with BuildLine():
            ThreePointArc((-5.763794646, -6.315154098), (-5.625595497, -6.291434191), (-5.48865567, -6.261282532))
            ThreePointArc((-5.48865567, -6.261282532), (-5.738638085, -6.258135911), (-5.955848779, -6.134359406))
            ThreePointArc((-5.955848779, -6.134359406), (-5.860518934, -6.225497395), (-5.763794646, -6.315154098))
        make_face()
        with BuildLine():
            ThreePointArc((-6.315154098, -5.763794646), (-6.225497395, -5.860518934), (-6.134359406, -5.955848779))
            ThreePointArc((-6.134359406, -5.955848779), (-6.258135911, -5.738638085), (-6.261282532, -5.48865567))
            ThreePointArc((-6.261282532, -5.48865567), (-6.291434191, -5.625595497), (-6.315154098, -5.763794646))
        make_face()
        with BuildLine():
            ThreePointArc((-1.834015536, -8.350981201), (-1.726191515, -8.261339585), (-1.622673976, -8.166757568))
            ThreePointArc((-1.622673976, -8.166757568), (-1.840738409, -8.289023721), (-2.090736641, -8.290435471))
            ThreePointArc((-2.090736641, -8.290435471), (-1.962609579, -8.321698363), (-1.834015536, -8.350981201))
        make_face()
        with BuildLine():
            ThreePointArc((-2.587186555, -8.149169634), (-2.461179428, -8.188106974), (-2.334586692, -8.225096047))
            ThreePointArc((-2.334586692, -8.225096047), (-2.550385637, -8.09887432), (-2.678101898, -7.883956508))
            ThreePointArc((-2.678101898, -7.883956508), (-2.635744088, -8.017625707), (-2.587186555, -8.149169634))
        make_face()
        with BuildLine():
            ThreePointArc((2.587186555, -8.149169634), (2.635744088, -8.017625707), (2.678101898, -7.883956508))
            ThreePointArc((2.678101898, -7.883956508), (2.550385637, -8.09887432), (2.334586692, -8.225096047))
            ThreePointArc((2.334586692, -8.225096047), (2.461179428, -8.188106974), (2.587186555, -8.149169634))
        make_face()
        with BuildLine():
            ThreePointArc((1.834015536, -8.350981201), (1.962609579, -8.321698363), (2.090736641, -8.290435471))
            ThreePointArc((2.090736641, -8.290435471), (1.840738409, -8.289023721), (1.622673976, -8.166757568))
            ThreePointArc((1.622673976, -8.166757568), (1.726191515, -8.261339585), (1.834015536, -8.350981201))
        make_face()
        with BuildLine():
            ThreePointArc((6.315154098, -5.763794646), (6.291434191, -5.625595497), (6.261282532, -5.48865567))
            ThreePointArc((6.261282532, -5.48865567), (6.258135911, -5.738638085), (6.134359406, -5.955848779))
            ThreePointArc((6.134359406, -5.955848779), (6.225497395, -5.860518934), (6.315154098, -5.763794646))
        make_face()
        with BuildLine():
            ThreePointArc((5.763794646, -6.315154098), (5.860518934, -6.225497395), (5.955848779, -6.134359406))
            ThreePointArc((5.955848779, -6.134359406), (5.738638085, -6.258135911), (5.48865567, -6.261282532))
            ThreePointArc((5.48865567, -6.261282532), (5.625595497, -6.291434191), (5.763794646, -6.315154098))
        make_face()
        with BuildLine():
            ThreePointArc((8.350981201, -1.834015536), (8.261339585, -1.726191515), (8.166757568, -1.622673976))
            ThreePointArc((8.166757568, -1.622673976), (8.289023721, -1.840738409), (8.290435471, -2.090736641))
            ThreePointArc((8.290435471, -2.090736641), (8.321698363, -1.962609579), (8.350981201, -1.834015536))
        make_face()
        with BuildLine():
            ThreePointArc((8.149169634, -2.587186555), (8.188106974, -2.461179428), (8.225096047, -2.334586692))
            ThreePointArc((8.225096047, -2.334586692), (8.09887432, -2.550385637), (7.883956508, -2.678101898))
            ThreePointArc((7.883956508, -2.678101898), (8.017625707, -2.635744088), (8.149169634, -2.587186555))
        make_face()
        with BuildLine():
            ThreePointArc((8.149169634, 2.587186555), (8.017625707, 2.635744088), (7.883956508, 2.678101898))
            ThreePointArc((7.883956508, 2.678101898), (8.09887432, 2.550385637), (8.225096047, 2.334586692))
            ThreePointArc((8.225096047, 2.334586692), (8.188106974, 2.461179428), (8.149169634, 2.587186555))
        make_face()
        with BuildLine():
            ThreePointArc((8.350981201, 1.834015536), (8.321698363, 1.962609579), (8.290435471, 2.090736641))
            ThreePointArc((8.290435471, 2.090736641), (8.289023721, 1.840738409), (8.166757568, 1.622673976))
            ThreePointArc((8.166757568, 1.622673976), (8.261339585, 1.726191515), (8.350981201, 1.834015536))
        make_face()
    extrude(amount=PATTERN_CIRCULAR_4_DEPTH, mode=Mode.SUBTRACT)


solid = part.part
